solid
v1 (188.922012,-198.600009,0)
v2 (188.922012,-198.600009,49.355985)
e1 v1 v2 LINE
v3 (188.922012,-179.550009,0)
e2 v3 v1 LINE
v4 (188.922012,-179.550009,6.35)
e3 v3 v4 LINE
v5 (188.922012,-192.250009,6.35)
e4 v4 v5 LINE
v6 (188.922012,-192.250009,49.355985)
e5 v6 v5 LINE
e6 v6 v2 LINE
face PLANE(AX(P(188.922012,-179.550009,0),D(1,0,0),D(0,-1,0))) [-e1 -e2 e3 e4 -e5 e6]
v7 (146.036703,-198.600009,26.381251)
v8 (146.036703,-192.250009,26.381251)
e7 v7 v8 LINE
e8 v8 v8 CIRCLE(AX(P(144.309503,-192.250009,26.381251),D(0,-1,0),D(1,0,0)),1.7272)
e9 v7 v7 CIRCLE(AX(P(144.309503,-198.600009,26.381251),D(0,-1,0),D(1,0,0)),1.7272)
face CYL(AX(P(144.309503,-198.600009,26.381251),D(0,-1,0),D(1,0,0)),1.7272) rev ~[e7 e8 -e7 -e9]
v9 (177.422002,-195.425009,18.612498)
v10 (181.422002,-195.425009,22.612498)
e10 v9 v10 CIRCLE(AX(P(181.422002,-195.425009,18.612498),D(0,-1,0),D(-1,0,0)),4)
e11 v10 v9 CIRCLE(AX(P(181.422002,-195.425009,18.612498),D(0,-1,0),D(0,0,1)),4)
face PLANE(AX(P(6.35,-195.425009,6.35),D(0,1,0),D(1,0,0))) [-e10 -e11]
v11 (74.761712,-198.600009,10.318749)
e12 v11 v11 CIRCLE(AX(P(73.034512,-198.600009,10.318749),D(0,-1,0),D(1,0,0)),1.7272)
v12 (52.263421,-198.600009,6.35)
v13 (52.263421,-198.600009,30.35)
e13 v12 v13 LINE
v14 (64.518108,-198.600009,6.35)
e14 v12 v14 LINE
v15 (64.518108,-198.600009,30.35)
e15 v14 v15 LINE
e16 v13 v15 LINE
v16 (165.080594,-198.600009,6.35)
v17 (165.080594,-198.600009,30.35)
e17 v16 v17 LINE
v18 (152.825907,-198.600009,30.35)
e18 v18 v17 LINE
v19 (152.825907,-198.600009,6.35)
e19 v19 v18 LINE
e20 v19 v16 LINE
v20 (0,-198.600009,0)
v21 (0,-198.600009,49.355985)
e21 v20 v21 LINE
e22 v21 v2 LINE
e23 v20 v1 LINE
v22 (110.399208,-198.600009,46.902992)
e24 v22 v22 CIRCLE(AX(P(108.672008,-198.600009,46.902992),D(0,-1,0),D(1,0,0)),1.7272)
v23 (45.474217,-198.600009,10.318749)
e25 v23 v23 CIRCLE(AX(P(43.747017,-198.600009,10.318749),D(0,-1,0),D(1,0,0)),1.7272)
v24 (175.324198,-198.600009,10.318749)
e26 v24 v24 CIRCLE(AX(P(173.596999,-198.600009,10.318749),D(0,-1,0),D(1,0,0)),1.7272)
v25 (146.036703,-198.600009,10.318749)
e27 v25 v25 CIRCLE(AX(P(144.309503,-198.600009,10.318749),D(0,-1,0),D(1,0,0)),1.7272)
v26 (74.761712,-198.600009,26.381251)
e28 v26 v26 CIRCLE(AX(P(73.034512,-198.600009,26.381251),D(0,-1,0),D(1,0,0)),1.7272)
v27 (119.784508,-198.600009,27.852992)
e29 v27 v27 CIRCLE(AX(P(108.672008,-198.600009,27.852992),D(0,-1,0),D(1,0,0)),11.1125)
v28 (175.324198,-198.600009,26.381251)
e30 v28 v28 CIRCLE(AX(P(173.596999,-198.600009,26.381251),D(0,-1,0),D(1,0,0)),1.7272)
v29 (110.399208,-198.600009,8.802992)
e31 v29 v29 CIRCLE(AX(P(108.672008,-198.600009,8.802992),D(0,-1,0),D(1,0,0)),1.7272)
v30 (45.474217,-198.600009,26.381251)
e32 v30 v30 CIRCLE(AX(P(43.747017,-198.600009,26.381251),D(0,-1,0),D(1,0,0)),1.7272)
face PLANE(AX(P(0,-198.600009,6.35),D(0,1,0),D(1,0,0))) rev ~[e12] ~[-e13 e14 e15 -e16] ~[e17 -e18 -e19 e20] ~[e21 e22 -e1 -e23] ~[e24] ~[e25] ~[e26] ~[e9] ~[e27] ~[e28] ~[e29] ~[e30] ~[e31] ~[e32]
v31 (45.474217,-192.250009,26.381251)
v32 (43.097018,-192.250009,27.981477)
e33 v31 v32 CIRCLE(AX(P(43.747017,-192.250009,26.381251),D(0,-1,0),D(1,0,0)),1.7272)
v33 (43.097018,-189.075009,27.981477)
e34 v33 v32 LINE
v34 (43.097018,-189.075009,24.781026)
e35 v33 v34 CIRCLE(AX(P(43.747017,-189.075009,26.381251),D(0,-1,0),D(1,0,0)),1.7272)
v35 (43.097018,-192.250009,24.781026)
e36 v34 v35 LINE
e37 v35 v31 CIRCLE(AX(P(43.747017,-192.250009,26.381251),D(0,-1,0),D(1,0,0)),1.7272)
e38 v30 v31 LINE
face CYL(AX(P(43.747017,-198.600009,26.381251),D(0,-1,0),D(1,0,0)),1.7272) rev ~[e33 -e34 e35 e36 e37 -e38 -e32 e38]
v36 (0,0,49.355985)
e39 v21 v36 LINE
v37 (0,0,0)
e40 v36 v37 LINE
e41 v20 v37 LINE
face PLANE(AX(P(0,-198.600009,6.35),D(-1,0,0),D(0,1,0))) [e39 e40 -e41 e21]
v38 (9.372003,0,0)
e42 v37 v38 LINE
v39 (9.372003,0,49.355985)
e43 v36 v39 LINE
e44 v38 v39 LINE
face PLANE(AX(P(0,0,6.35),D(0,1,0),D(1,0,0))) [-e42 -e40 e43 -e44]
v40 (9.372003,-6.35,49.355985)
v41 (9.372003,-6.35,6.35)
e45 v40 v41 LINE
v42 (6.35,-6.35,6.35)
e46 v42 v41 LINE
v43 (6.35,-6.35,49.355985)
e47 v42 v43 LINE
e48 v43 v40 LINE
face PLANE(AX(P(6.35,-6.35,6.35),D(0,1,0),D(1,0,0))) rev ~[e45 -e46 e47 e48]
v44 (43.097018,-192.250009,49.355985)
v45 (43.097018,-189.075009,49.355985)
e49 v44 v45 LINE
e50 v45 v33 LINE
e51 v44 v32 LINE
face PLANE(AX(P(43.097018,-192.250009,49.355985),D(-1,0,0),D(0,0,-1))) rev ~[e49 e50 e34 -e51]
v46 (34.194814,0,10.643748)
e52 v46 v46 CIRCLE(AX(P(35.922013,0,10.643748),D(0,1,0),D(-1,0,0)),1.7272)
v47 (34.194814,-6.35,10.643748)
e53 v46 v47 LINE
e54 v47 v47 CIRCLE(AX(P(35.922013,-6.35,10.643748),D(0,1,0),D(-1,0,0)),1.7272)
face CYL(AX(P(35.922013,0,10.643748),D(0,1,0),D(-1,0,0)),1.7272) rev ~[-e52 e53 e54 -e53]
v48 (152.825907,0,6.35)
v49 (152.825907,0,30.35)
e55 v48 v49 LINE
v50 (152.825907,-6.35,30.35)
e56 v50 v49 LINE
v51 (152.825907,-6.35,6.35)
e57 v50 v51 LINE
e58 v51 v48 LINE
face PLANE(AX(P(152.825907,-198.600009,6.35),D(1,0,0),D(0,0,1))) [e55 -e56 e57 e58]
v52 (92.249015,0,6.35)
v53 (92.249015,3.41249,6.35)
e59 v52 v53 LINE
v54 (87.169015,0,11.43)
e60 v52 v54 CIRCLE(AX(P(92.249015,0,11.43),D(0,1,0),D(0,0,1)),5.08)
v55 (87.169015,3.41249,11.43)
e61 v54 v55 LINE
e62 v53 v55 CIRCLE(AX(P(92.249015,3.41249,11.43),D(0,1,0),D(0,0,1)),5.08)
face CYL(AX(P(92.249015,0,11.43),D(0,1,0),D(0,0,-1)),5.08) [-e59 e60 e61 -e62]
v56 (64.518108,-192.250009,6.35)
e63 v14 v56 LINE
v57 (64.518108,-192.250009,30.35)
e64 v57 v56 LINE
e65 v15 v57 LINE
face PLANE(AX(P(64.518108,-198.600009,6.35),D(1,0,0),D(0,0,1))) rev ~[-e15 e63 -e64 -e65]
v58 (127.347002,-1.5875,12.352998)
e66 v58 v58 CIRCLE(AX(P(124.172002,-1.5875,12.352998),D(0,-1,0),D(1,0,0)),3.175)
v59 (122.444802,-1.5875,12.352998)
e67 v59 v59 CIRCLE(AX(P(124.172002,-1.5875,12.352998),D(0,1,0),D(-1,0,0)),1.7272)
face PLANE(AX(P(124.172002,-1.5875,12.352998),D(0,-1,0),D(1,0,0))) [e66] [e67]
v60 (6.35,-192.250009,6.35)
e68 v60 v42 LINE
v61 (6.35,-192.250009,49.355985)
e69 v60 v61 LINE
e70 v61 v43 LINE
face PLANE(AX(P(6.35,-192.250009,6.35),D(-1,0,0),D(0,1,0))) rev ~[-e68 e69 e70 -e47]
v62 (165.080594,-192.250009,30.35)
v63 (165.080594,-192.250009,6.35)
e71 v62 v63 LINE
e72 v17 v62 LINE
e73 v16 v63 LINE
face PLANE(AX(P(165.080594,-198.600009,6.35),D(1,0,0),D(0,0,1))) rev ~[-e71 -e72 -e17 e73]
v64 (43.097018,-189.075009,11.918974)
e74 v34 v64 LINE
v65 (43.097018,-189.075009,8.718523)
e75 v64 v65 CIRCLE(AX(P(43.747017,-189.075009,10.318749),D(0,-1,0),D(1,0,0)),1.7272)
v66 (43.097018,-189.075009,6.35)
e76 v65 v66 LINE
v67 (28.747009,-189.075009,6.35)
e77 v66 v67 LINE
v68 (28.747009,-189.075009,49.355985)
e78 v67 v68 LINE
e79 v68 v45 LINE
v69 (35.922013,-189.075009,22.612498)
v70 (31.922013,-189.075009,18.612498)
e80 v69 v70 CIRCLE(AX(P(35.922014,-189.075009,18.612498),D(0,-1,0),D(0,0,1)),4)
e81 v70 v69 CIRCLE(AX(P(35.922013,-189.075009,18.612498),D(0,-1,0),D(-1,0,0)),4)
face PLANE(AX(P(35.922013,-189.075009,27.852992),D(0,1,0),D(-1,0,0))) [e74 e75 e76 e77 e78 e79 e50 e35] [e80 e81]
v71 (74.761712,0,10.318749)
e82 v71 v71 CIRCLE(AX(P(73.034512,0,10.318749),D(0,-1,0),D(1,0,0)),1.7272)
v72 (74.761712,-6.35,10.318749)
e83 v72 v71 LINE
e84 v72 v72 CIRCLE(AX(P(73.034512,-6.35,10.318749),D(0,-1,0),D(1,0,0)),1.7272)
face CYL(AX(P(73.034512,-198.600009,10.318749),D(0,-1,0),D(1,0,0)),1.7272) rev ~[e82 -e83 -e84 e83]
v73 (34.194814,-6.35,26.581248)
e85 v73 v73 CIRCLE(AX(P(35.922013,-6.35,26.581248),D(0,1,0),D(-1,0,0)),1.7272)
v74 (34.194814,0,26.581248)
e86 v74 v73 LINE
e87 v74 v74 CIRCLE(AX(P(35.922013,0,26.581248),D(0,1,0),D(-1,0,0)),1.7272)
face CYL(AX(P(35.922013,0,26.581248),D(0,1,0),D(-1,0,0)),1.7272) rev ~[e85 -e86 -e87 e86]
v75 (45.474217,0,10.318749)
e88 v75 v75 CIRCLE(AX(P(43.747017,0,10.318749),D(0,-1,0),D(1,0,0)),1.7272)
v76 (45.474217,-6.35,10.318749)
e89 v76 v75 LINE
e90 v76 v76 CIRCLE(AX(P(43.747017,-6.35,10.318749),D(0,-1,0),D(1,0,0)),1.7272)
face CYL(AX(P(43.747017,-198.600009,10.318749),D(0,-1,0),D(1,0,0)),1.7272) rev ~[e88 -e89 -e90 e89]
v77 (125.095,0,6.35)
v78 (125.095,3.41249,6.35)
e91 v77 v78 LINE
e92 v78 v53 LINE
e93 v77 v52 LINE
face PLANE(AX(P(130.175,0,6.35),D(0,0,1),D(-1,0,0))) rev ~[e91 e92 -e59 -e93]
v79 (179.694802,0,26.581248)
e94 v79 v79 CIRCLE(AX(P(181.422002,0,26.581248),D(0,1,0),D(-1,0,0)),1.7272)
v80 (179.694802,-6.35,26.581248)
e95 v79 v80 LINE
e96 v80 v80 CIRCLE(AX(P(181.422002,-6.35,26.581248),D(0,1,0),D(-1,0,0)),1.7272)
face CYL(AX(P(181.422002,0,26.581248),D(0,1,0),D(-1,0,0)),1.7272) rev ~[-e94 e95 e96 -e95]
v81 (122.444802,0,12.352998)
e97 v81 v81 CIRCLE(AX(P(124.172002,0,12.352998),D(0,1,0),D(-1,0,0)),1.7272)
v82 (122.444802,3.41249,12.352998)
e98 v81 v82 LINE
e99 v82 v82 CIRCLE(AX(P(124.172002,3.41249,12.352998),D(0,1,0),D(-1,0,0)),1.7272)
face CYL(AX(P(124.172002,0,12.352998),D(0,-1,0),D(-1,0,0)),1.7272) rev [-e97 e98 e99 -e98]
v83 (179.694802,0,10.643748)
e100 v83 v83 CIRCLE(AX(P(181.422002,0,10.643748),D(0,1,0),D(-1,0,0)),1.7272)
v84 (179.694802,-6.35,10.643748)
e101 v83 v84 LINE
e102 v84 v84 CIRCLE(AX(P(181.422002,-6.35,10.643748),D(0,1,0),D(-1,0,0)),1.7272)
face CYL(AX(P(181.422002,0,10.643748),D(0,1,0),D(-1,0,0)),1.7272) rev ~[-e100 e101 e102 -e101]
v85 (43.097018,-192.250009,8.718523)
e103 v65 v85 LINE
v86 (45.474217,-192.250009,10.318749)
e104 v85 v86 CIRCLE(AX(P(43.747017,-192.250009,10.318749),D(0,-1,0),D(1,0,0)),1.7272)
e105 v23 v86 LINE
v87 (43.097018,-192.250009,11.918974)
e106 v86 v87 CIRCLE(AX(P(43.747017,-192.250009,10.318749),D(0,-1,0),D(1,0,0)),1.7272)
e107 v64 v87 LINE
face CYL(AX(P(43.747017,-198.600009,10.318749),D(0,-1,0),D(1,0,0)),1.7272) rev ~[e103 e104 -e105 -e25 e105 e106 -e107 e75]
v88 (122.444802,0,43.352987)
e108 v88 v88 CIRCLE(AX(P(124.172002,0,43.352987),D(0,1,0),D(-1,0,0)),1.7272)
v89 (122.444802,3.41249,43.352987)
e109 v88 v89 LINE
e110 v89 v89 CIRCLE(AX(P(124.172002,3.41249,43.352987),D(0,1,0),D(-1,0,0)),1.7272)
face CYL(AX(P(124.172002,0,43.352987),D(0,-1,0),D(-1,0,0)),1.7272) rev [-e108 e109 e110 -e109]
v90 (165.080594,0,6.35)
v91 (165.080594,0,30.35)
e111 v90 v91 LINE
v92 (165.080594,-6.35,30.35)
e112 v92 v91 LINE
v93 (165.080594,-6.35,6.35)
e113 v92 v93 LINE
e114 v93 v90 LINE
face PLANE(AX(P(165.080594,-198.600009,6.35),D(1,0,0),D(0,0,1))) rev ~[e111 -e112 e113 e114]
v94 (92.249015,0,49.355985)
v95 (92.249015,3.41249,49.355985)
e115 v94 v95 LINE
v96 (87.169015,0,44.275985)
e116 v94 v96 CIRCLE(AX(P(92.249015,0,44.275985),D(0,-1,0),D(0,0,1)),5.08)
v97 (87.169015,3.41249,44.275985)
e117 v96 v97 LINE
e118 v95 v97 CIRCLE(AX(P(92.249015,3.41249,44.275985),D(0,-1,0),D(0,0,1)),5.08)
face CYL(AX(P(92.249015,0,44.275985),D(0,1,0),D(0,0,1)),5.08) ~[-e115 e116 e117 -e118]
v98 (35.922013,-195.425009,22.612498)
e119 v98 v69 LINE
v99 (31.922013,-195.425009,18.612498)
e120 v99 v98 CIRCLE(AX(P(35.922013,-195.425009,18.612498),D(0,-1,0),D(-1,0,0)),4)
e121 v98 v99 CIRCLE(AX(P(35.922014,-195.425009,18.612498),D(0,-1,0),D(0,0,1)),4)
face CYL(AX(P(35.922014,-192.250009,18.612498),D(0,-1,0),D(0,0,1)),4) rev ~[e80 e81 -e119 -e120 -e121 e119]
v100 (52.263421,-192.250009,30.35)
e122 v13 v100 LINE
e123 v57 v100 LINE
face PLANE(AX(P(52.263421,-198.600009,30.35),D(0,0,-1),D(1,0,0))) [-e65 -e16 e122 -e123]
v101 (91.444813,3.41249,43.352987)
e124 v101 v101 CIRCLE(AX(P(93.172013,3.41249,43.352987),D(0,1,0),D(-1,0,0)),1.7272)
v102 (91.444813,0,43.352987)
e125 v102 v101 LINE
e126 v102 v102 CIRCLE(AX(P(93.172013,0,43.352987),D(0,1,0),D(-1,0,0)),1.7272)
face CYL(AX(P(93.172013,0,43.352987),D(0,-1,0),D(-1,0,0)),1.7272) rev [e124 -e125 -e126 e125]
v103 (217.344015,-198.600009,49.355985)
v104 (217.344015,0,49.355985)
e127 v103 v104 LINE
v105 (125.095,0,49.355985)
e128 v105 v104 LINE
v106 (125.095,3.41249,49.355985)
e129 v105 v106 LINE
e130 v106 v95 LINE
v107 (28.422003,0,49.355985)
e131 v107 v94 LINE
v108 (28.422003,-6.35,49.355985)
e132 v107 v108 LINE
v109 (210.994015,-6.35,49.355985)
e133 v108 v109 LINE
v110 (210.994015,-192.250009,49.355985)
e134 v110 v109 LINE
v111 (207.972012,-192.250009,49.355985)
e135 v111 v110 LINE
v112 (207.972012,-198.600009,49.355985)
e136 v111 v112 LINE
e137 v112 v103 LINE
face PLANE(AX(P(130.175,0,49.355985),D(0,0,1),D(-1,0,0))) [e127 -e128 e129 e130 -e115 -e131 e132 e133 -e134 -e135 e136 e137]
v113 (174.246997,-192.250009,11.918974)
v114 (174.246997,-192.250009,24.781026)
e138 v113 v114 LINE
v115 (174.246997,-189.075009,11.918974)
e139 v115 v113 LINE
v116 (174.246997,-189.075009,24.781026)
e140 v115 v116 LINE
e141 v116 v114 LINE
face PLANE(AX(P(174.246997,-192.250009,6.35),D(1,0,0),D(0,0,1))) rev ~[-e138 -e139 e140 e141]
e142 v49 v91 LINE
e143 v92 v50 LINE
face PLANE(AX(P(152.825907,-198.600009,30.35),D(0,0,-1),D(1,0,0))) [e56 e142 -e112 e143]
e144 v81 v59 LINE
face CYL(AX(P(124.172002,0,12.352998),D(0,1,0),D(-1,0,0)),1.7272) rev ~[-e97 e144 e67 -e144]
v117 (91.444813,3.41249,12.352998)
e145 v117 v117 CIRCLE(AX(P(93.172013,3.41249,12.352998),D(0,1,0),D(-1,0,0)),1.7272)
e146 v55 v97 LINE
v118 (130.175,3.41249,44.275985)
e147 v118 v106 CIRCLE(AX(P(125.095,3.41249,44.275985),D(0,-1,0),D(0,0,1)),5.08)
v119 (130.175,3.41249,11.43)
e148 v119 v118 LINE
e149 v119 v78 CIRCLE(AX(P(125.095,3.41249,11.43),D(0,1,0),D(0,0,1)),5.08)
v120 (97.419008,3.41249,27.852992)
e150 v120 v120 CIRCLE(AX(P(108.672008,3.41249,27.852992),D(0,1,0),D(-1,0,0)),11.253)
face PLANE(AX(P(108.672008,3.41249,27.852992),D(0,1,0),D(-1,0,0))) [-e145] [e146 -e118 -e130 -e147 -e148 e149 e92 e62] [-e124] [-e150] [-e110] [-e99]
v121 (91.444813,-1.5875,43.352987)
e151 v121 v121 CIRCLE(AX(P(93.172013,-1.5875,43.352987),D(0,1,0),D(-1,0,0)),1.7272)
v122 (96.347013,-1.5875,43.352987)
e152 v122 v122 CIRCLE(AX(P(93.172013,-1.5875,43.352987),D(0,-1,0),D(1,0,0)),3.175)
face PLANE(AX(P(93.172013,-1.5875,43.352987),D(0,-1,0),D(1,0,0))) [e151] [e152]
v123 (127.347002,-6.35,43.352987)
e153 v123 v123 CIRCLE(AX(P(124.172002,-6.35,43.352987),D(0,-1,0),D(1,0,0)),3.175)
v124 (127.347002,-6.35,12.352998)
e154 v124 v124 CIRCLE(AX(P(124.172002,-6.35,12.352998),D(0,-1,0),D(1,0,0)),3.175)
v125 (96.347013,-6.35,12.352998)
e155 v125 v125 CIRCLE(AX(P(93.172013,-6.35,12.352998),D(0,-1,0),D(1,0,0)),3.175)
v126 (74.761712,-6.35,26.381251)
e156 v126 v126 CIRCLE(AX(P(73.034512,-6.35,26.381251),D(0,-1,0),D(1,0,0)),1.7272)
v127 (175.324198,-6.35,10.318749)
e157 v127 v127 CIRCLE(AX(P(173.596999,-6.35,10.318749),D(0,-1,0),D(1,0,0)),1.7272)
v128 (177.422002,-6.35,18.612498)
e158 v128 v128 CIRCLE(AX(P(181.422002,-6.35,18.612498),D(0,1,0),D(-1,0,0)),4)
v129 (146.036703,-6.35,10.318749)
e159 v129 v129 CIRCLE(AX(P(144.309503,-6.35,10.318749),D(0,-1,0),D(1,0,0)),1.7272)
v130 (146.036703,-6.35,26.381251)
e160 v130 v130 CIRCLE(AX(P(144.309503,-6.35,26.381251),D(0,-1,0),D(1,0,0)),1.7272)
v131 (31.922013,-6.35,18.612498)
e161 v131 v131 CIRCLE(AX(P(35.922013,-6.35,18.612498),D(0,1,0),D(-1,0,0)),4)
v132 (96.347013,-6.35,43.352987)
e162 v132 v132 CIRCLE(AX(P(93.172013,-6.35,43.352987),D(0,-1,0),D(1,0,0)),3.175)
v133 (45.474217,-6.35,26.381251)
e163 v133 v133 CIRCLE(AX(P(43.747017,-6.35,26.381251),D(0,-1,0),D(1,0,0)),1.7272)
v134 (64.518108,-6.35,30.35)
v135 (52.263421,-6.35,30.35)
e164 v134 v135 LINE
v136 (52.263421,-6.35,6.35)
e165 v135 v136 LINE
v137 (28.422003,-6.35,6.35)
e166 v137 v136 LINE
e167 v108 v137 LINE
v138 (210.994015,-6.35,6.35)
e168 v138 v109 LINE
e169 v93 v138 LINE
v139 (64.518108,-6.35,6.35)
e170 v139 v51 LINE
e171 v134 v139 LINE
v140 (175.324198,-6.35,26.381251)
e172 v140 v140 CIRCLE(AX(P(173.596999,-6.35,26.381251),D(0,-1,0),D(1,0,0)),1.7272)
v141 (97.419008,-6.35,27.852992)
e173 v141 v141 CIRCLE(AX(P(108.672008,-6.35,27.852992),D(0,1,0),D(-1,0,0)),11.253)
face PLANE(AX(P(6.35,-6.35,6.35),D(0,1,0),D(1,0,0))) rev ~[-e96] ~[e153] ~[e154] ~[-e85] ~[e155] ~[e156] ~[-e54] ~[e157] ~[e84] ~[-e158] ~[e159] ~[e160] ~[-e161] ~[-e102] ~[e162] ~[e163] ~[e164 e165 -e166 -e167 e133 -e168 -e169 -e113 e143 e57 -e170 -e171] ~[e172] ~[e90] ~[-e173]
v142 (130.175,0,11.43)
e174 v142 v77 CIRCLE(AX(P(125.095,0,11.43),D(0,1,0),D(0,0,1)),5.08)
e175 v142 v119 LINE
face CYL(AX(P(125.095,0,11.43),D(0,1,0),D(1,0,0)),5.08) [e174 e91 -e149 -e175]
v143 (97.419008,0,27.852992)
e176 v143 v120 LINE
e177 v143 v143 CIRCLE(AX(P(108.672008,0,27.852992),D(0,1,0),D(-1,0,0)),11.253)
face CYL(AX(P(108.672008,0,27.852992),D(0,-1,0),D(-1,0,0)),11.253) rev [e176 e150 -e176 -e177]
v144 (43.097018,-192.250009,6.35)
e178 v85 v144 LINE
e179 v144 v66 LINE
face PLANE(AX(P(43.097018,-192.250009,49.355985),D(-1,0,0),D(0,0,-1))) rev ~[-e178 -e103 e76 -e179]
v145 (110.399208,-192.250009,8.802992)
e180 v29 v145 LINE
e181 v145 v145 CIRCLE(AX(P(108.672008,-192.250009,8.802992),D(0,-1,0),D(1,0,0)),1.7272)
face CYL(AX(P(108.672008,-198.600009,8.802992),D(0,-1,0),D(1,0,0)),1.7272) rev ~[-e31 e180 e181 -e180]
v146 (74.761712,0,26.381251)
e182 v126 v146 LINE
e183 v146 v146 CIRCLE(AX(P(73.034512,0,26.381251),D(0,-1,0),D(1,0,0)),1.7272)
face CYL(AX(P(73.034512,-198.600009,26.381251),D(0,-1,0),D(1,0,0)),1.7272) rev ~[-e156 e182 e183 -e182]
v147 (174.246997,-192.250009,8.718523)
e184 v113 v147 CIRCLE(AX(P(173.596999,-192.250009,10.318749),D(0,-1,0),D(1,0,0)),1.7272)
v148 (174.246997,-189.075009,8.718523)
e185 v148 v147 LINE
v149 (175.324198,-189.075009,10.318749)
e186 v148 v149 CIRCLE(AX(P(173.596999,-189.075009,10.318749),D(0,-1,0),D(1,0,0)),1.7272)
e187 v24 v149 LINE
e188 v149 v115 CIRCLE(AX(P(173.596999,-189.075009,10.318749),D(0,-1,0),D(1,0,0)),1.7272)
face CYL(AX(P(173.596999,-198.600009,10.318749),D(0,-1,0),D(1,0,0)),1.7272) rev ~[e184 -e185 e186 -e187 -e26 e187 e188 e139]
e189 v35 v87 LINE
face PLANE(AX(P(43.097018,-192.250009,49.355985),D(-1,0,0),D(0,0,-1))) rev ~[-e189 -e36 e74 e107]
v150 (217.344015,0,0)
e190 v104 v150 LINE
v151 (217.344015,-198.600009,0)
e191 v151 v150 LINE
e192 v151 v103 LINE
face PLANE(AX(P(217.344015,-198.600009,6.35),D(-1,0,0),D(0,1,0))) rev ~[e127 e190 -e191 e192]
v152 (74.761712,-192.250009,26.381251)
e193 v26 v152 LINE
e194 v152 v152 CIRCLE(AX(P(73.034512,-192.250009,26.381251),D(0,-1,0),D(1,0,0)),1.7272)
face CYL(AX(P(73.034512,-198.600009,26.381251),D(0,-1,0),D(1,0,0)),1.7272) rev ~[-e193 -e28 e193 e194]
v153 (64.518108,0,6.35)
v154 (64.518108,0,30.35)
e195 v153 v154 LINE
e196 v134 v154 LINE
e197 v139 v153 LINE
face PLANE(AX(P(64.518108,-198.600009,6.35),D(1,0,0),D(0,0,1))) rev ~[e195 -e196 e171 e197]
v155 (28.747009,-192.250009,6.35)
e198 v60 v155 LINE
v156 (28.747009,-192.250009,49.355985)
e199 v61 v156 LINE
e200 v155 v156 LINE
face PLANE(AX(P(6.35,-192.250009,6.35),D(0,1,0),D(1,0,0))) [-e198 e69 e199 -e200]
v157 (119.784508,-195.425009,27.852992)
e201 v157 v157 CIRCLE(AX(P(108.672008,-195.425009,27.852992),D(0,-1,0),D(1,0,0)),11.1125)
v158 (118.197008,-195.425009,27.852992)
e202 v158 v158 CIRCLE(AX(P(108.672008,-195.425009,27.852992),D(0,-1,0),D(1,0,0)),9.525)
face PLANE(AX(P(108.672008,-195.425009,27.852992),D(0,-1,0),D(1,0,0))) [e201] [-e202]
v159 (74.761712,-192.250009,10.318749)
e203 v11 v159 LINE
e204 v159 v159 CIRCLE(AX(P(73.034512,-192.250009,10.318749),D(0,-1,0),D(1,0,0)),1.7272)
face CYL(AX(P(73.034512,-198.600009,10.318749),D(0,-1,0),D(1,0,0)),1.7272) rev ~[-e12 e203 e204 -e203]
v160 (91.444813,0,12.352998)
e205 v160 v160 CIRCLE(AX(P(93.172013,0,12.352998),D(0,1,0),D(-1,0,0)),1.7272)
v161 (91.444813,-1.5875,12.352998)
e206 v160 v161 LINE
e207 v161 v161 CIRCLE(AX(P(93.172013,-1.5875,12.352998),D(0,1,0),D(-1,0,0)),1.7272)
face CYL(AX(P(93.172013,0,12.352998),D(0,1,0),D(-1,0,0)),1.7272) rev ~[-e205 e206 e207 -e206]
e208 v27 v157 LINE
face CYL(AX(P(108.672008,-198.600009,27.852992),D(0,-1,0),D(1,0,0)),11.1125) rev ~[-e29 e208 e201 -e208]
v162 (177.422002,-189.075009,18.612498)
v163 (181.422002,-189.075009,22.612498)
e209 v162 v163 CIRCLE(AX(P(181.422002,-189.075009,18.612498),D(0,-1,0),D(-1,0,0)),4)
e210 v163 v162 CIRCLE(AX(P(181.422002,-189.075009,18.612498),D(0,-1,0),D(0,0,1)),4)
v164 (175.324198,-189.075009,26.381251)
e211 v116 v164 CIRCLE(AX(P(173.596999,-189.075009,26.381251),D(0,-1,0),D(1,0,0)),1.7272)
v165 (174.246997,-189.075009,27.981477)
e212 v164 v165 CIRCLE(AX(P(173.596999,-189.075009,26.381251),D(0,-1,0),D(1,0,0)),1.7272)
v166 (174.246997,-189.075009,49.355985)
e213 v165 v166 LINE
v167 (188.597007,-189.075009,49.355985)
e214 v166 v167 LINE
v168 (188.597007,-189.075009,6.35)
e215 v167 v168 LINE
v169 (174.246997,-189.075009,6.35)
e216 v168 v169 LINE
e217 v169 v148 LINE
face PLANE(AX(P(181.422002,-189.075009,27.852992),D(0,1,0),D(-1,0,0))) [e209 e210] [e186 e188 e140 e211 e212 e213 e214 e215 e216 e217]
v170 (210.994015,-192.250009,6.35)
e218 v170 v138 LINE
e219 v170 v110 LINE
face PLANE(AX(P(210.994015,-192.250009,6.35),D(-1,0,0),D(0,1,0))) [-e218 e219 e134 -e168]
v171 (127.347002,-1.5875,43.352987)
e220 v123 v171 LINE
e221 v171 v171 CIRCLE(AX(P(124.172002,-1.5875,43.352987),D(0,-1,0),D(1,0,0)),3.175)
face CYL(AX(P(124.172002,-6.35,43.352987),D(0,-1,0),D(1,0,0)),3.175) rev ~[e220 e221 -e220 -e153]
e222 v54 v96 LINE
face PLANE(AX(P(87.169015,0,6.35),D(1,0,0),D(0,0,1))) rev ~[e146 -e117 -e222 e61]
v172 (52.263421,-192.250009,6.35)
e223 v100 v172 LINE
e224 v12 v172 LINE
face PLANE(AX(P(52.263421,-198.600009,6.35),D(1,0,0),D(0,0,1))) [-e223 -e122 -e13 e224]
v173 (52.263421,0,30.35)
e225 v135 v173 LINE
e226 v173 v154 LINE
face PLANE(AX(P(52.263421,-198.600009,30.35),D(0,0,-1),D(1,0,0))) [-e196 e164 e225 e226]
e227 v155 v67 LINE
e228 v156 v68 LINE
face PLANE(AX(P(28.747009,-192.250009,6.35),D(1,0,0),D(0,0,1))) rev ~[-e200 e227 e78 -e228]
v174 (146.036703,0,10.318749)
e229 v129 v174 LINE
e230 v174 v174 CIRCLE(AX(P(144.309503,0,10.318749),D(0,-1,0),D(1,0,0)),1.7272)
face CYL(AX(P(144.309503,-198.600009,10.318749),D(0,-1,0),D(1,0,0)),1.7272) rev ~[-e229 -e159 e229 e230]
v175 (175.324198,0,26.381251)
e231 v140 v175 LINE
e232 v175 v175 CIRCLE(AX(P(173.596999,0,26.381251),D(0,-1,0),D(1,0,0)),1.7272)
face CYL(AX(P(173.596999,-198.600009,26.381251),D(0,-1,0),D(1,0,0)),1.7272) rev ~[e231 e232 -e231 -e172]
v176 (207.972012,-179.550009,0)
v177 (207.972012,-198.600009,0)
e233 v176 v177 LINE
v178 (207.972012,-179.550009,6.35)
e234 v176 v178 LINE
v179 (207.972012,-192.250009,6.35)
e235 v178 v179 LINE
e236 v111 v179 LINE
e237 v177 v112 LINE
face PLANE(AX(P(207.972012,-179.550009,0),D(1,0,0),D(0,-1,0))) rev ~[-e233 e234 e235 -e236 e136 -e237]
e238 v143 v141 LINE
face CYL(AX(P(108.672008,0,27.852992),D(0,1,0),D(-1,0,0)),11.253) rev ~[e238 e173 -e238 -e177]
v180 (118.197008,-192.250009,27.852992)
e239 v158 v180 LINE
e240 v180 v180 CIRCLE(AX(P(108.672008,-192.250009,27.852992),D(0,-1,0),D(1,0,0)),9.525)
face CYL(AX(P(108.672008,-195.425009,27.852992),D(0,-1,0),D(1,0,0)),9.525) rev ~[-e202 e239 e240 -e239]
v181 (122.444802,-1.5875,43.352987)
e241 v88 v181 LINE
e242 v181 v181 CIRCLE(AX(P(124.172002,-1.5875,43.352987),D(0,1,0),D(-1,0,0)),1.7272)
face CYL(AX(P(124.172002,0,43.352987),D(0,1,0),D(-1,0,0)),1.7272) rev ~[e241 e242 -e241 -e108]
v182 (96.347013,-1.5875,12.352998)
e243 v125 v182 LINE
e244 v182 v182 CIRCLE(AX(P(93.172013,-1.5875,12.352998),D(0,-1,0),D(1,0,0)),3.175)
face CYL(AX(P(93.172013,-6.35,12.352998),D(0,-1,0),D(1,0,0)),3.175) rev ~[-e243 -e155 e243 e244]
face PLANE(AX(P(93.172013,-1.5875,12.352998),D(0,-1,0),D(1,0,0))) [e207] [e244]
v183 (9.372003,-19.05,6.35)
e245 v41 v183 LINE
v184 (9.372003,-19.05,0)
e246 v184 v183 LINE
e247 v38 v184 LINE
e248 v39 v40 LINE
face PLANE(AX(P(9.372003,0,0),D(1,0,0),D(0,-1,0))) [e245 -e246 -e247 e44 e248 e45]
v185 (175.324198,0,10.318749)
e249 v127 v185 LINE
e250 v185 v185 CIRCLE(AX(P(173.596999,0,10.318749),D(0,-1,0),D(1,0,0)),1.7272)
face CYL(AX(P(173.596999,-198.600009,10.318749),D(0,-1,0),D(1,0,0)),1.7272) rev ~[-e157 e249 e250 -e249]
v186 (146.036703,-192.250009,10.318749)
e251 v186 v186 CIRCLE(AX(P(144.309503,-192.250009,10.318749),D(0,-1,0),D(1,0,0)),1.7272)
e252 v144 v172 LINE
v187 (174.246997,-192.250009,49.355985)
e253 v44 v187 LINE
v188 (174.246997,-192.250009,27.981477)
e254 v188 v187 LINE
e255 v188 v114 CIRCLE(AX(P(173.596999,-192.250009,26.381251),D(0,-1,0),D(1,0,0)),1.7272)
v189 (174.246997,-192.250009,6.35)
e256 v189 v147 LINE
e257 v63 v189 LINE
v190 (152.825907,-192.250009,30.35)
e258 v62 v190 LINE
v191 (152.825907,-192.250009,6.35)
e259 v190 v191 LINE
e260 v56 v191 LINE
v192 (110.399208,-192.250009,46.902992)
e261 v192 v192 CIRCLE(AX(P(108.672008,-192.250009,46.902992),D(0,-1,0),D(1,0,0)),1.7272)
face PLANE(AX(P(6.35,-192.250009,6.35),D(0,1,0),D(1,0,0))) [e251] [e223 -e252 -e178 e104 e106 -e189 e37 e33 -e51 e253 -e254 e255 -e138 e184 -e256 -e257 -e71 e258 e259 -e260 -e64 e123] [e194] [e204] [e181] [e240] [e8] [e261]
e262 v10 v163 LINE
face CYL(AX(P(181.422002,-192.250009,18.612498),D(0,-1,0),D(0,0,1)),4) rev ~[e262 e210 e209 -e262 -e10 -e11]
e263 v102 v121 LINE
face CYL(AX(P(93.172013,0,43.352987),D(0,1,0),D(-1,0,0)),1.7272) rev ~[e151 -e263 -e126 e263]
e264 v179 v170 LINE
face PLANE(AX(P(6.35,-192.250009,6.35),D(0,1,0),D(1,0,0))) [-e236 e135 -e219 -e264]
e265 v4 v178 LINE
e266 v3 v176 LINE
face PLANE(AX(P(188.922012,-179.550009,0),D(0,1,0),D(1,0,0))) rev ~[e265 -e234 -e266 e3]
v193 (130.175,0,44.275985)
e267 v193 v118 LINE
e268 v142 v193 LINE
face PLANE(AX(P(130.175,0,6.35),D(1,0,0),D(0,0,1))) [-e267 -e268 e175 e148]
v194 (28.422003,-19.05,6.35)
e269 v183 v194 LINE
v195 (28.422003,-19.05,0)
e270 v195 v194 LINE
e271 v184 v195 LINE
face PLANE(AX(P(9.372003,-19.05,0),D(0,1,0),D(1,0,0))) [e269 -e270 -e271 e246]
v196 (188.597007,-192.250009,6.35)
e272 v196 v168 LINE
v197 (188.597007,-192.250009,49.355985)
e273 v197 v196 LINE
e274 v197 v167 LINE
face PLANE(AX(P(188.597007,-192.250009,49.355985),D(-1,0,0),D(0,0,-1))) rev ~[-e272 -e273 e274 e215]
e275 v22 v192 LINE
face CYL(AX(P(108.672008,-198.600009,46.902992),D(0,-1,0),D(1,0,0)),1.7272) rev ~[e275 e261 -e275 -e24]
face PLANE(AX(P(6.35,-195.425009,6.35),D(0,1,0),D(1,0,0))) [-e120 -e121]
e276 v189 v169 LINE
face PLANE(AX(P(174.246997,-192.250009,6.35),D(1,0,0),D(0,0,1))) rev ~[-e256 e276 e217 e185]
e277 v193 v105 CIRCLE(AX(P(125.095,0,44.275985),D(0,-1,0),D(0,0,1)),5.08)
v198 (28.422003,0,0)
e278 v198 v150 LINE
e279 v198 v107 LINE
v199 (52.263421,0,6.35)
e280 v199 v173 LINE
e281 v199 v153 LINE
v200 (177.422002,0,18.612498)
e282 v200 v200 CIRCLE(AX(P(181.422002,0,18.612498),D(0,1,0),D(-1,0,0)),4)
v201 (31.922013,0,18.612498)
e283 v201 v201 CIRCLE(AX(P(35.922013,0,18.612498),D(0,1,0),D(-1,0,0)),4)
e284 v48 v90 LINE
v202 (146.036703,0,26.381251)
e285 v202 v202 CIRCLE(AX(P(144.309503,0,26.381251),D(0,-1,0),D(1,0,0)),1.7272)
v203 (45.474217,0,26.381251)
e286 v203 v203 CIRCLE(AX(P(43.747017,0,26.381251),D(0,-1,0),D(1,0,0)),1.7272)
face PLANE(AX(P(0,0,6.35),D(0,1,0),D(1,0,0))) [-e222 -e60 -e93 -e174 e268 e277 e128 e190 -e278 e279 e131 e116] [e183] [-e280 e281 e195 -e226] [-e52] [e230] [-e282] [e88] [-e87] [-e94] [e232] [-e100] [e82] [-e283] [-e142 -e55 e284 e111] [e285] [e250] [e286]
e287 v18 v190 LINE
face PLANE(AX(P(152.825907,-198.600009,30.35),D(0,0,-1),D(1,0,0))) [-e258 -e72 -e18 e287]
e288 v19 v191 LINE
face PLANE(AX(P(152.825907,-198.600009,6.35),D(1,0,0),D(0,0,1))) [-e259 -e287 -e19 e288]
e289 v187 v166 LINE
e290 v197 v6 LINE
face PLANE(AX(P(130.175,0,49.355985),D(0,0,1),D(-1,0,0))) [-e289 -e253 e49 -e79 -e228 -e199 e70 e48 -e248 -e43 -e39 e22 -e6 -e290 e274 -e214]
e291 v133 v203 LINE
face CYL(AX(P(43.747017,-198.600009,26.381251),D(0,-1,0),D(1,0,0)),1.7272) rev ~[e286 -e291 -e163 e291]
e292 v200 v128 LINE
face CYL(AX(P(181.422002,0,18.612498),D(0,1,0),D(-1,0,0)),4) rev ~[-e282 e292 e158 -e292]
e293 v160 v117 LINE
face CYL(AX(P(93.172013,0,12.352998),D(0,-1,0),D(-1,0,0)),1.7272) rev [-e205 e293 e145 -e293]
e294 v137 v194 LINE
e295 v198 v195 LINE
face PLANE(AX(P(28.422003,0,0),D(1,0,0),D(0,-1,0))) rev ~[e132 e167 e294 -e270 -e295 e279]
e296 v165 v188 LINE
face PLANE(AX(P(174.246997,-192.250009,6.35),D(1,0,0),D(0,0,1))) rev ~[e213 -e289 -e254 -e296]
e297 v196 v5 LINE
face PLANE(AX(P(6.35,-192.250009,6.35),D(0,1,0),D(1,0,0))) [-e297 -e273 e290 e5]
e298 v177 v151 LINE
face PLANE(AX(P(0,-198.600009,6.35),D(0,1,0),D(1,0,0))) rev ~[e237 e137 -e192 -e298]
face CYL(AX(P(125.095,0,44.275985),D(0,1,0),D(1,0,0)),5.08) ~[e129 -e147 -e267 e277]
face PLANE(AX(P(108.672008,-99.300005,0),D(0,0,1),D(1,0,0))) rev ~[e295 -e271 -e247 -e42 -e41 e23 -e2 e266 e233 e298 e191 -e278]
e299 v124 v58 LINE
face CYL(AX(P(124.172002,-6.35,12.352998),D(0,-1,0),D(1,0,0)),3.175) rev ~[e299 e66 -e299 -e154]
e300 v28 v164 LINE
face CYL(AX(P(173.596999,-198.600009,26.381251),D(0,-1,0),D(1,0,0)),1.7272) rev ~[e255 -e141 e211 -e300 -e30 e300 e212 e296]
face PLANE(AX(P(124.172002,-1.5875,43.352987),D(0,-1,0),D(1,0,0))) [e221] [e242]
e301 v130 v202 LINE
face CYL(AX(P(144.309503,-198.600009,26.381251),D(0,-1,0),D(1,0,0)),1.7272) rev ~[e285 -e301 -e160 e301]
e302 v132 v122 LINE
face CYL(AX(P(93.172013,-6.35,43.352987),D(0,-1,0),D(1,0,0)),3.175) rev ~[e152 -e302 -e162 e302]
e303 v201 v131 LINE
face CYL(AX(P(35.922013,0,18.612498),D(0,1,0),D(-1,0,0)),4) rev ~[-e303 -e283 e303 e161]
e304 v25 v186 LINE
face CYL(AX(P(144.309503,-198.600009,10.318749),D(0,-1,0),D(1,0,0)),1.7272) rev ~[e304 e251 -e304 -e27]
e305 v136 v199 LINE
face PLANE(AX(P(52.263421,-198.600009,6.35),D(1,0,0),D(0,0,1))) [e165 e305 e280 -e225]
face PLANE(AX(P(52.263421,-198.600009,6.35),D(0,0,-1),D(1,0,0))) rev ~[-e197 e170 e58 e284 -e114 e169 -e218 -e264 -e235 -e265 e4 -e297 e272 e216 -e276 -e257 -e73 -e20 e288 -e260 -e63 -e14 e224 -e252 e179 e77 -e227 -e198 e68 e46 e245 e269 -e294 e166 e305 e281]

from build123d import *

# Parameters (mm, degrees)
F0_W      = 217.3440154
F0_H      = 198.6000092
F1_DEPTH  = 6.35
F2_W      = 217.3440154
F2_H      = 198.6000092
F2_W_2    = 204.6440154
F2_H_2    = 185.9000092
F3_DEPTH  = 43.0059846
F4_R      = 1.7272
F4_R_2    = 11.2530001
F4_R_3    = 4
F5_DEPTH  = 6.35
F6_DEPTH  = 6.35
F7_R      = 11.1125
F8_DEPTH  = 3.175
F9_R      = 9.525
F10_DEPTH = 3.175
F11_R     = 1.7272
F12_DEPTH = 6.35
F14_DEPTH = 3.175
F15_DEPTH = 3.175
F16_R     = 1.7272
F17_DEPTH = 6.35
F18_W     = 12.2546872
F18_H     = 24
F18_R     = 1.7272
F19_DEPTH = 198.6000092
F20_R     = 3.175
F21_DEPTH = 4.7625
F22_W     = 43.0059846
F22_H     = 43.0059846
F22_R     = 1.7272
F22_R_2   = 11.2530001
F23_DEPTH = 3.41249
F24_R     = 5.08
F25_W     = 19.05
F25_H     = 19.05
F26_DEPTH = 49.3559846


# Not quite as in the source:
# - a feature names something its author has since deleted; it is built from what else it names


with BuildPart() as f1:
    # F0 (on Top) → F1 (new body)
    with BuildSketch(Plane.XY):
        with Locations((108.6720077, -99.3000046)):
            Rectangle(F0_W, F0_H)
    extrude(amount=F1_DEPTH)

    # F2 (on face) → F3 (join)
    with BuildSketch(Plane.XY.offset(6.35)):
        with Locations((108.6720077, -99.3000046)):
            Rectangle(F2_W, F2_H)
        with Locations((108.6720077, -99.3000046)):
            Rectangle(F2_W_2, F2_H_2, mode=Mode.SUBTRACT)
    extrude(amount=F3_DEPTH)

    # F4 (on face) → F5 (cut, through all)
    with BuildSketch(Plane(origin=(0, 0, 0), x_dir=(-1, 0, 0), z_dir=(0, 1, 0))):
        with Locations((-124.1720021, 43.3529867)):
            Circle(F4_R)
        with Locations((-93.1720133, 43.3529867)):
            Circle(F4_R)
        with Locations((-124.1720021, 12.3529979)):
            Circle(F4_R)
        with Locations((-108.6720077, 27.8529923)):
            Circle(F4_R_2)
        with Locations((-93.1720133, 12.3529979)):
            Circle(F4_R)
        with Locations((-181.4220019, 18.6124977)):
            Circle(F4_R_3)
        with Locations((-35.9220135, 18.6124977)):
            Circle(F4_R_3)
    extrude(amount=-F5_DEPTH, mode=Mode.SUBTRACT)

    # F4 (on face) → F6 (cut, through all)
    with BuildSketch(Plane(origin=(0, 0, 0), x_dir=(-1, 0, 0), z_dir=(0, 1, 0))):
        with Locations((-124.1720021, 43.3529867)):
            Circle(F4_R)
        with Locations((-93.1720133, 43.3529867)):
            Circle(F4_R)
        with Locations((-124.1720021, 12.3529979)):
            Circle(F4_R)
        with Locations((-108.6720077, 27.8529923)):
            Circle(F4_R_2)
        with Locations((-93.1720133, 12.3529979)):
            Circle(F4_R)
        with Locations((-181.4220019, 18.6124977)):
            Circle(F4_R_3)
        with Locations((-35.9220135, 18.6124977)):
            Circle(F4_R_3)
    extrude(amount=-F6_DEPTH, mode=Mode.SUBTRACT)

    # F7 (on face) → F8 (cut)
    with BuildSketch(Plane.XZ.offset(198.6000092)):
        with Locations((108.6720077, 27.8529923)):
            Circle(F7_R)
    extrude(amount=-F8_DEPTH, mode=Mode.SUBTRACT)

    # F9 (on face) → F10 (cut, through all)
    with BuildSketch(Plane.XZ.offset(195.4250092)):
        with Locations((108.6720077, 27.8529923)):
            Circle(F9_R)
    extrude(amount=-F10_DEPTH, mode=Mode.SUBTRACT)

    # F11 (on face) → F12 (cut, through all)
    with BuildSketch(Plane.XZ.offset(198.6000092)):
        with Locations((108.6720077, 46.9029923)):
            Circle(F11_R)
        with Locations((108.6720077, 8.8029923)):
            Circle(F11_R)
    extrude(amount=-F12_DEPTH, mode=Mode.SUBTRACT)

    # F13 (on face) → F14 (join)
    with BuildSketch(Plane(origin=(0, -192.2500092, 0), x_dir=(-1, 0, 0), z_dir=(0, 1, 0))):
        Polygon((-28.7470088, 6.35), (-28.7470088, 49.3559846), (-35.9220135, 49.3559846), (-43.0970182, 49.3559846), (-43.0970182, 6.35), align=None)
        with BuildLine():
            ThreePointArc((-31.9220135, 18.6124977), (-38.7504406247, 15.7840705753), (-35.9220135, 22.6124977))
            ThreePointArc((-35.9220135, 22.6124977), (-33.0935863753, 21.4409248247), (-31.9220135, 18.6124977))
        make_face(mode=Mode.SUBTRACT)
        Polygon((-174.2469972, 6.35), (-174.2469972, 49.3559846), (-181.4220019, 49.3559846), (-188.5970066, 49.3559846), (-188.5970066, 6.35), align=None)
        with BuildLine():
            ThreePointArc((-177.4220019, 18.6124977), (-184.2504290247, 15.7840705753), (-181.4220019, 22.6124977))
            ThreePointArc((-181.4220019, 22.6124977), (-178.5935747753, 21.4409248247), (-177.4220019, 18.6124977))
        make_face(mode=Mode.SUBTRACT)
    extrude(amount=F14_DEPTH)

    # F15 (cut): faces of the model
    f15_faces = [f1.faces().sort_by_distance(p)[0] for p in [
        (181.4220019, -192.2500092, 18.6124977),
        (35.9220135, -192.2500092, 18.6124977),
    ]]
    extrude(f15_faces, amount=-F15_DEPTH, mode=Mode.SUBTRACT)

    # F16 (on face) → F17 (cut, through all)
    with BuildSketch(Plane(origin=(0, 0, 0), x_dir=(-1, 0, 0), z_dir=(0, 1, 0))):
        with Locations((-181.4220019, 10.6437477)):
            Circle(F16_R)
        with Locations((-181.4220019, 26.5812477)):
            Circle(F16_R)
        with Locations((-35.9220135, 10.6437477)):
            Circle(F16_R)
        with Locations((-35.9220135, 26.5812477)):
            Circle(F16_R)
    extrude(amount=-F17_DEPTH, mode=Mode.SUBTRACT)

    # F18 (on face) → F19 (cut, through all)
    with BuildSketch(Plane.XZ.offset(198.6000092)):
        with Locations((158.9532508, 18.35)):
            Rectangle(F18_W, F18_H)
        with Locations((173.5969985, 26.3812514)):
            Circle(F18_R)
        with Locations((173.5969985, 10.3187486)):
            Circle(F18_R)
        with Locations((144.3095031, 26.3812514)):
            Circle(F18_R)
        with Locations((144.3095031, 10.3187486)):
            Circle(F18_R)
        with Locations((58.3907646, 18.35)):
            Rectangle(F18_W, F18_H)
        with Locations((43.7470169, 26.3812514)):
            Circle(F18_R)
        with Locations((73.0345123, 26.3812514)):
            Circle(F18_R)
        with Locations((73.0345123, 10.3187486)):
            Circle(F18_R)
        with Locations((43.7470169, 10.3187486)):
            Circle(F18_R)
    extrude(amount=-F19_DEPTH, mode=Mode.SUBTRACT)

    # F20 (on face) → F21 (cut)
    with BuildSketch(Plane.XZ.offset(6.35)):
        with Locations((93.1720133, 43.3529867)):
            Circle(F20_R)
        with Locations((124.1720021, 43.3529867)):
            Circle(F20_R)
        with Locations((124.1720021, 12.3529979)):
            Circle(F20_R)
        with Locations((93.1720133, 12.3529979)):
            Circle(F20_R)
    extrude(amount=-F21_DEPTH, mode=Mode.SUBTRACT)

    # F22 (on face) → F23 (join)
    with BuildSketch(Plane(origin=(0, 0, 0), x_dir=(-1, 0, 0), z_dir=(0, 1, 0))):
        with Locations((-108.6720077, 27.8529923)):
            Rectangle(F22_W, F22_H)
        with Locations((-124.1720021, 12.3529979)):
            Circle(F22_R, mode=Mode.SUBTRACT)
        with Locations((-93.1720133, 12.3529979)):
            Circle(F22_R, mode=Mode.SUBTRACT)
        with Locations((-124.1720021, 43.3529867)):
            Circle(F22_R, mode=Mode.SUBTRACT)
        with Locations((-108.6720077, 27.8529923)):
            Circle(F22_R_2, mode=Mode.SUBTRACT)
        with Locations((-93.1720133, 43.3529867)):
            Circle(F22_R, mode=Mode.SUBTRACT)
    extrude(amount=F23_DEPTH)

    # F24
    f24_edges = [f1.edges().sort_by_distance(p)[0] for p in [
        (87.169015, 1.706245, 49.355985),
        (130.175, 1.706245, 49.355985),
        (87.169015, 1.706245, 6.35),
        (130.175, 1.706245, 6.35),
    ]]
    fillet(f24_edges, radius=F24_R)

    # F25 (on face) → F26 (cut, through all)
    with BuildSketch(Plane(origin=(0, 0, 0), x_dir=(1, 0, 0), z_dir=(0, 0, -1))):
        with Locations((198.4470123, 189.0750092)):
            Rectangle(F25_W, F25_H)
        with Locations((18.8970031, 9.525)):
            Rectangle(F25_W, F25_H)
    extrude(amount=-F26_DEPTH, mode=Mode.SUBTRACT)


solid = f1.part
